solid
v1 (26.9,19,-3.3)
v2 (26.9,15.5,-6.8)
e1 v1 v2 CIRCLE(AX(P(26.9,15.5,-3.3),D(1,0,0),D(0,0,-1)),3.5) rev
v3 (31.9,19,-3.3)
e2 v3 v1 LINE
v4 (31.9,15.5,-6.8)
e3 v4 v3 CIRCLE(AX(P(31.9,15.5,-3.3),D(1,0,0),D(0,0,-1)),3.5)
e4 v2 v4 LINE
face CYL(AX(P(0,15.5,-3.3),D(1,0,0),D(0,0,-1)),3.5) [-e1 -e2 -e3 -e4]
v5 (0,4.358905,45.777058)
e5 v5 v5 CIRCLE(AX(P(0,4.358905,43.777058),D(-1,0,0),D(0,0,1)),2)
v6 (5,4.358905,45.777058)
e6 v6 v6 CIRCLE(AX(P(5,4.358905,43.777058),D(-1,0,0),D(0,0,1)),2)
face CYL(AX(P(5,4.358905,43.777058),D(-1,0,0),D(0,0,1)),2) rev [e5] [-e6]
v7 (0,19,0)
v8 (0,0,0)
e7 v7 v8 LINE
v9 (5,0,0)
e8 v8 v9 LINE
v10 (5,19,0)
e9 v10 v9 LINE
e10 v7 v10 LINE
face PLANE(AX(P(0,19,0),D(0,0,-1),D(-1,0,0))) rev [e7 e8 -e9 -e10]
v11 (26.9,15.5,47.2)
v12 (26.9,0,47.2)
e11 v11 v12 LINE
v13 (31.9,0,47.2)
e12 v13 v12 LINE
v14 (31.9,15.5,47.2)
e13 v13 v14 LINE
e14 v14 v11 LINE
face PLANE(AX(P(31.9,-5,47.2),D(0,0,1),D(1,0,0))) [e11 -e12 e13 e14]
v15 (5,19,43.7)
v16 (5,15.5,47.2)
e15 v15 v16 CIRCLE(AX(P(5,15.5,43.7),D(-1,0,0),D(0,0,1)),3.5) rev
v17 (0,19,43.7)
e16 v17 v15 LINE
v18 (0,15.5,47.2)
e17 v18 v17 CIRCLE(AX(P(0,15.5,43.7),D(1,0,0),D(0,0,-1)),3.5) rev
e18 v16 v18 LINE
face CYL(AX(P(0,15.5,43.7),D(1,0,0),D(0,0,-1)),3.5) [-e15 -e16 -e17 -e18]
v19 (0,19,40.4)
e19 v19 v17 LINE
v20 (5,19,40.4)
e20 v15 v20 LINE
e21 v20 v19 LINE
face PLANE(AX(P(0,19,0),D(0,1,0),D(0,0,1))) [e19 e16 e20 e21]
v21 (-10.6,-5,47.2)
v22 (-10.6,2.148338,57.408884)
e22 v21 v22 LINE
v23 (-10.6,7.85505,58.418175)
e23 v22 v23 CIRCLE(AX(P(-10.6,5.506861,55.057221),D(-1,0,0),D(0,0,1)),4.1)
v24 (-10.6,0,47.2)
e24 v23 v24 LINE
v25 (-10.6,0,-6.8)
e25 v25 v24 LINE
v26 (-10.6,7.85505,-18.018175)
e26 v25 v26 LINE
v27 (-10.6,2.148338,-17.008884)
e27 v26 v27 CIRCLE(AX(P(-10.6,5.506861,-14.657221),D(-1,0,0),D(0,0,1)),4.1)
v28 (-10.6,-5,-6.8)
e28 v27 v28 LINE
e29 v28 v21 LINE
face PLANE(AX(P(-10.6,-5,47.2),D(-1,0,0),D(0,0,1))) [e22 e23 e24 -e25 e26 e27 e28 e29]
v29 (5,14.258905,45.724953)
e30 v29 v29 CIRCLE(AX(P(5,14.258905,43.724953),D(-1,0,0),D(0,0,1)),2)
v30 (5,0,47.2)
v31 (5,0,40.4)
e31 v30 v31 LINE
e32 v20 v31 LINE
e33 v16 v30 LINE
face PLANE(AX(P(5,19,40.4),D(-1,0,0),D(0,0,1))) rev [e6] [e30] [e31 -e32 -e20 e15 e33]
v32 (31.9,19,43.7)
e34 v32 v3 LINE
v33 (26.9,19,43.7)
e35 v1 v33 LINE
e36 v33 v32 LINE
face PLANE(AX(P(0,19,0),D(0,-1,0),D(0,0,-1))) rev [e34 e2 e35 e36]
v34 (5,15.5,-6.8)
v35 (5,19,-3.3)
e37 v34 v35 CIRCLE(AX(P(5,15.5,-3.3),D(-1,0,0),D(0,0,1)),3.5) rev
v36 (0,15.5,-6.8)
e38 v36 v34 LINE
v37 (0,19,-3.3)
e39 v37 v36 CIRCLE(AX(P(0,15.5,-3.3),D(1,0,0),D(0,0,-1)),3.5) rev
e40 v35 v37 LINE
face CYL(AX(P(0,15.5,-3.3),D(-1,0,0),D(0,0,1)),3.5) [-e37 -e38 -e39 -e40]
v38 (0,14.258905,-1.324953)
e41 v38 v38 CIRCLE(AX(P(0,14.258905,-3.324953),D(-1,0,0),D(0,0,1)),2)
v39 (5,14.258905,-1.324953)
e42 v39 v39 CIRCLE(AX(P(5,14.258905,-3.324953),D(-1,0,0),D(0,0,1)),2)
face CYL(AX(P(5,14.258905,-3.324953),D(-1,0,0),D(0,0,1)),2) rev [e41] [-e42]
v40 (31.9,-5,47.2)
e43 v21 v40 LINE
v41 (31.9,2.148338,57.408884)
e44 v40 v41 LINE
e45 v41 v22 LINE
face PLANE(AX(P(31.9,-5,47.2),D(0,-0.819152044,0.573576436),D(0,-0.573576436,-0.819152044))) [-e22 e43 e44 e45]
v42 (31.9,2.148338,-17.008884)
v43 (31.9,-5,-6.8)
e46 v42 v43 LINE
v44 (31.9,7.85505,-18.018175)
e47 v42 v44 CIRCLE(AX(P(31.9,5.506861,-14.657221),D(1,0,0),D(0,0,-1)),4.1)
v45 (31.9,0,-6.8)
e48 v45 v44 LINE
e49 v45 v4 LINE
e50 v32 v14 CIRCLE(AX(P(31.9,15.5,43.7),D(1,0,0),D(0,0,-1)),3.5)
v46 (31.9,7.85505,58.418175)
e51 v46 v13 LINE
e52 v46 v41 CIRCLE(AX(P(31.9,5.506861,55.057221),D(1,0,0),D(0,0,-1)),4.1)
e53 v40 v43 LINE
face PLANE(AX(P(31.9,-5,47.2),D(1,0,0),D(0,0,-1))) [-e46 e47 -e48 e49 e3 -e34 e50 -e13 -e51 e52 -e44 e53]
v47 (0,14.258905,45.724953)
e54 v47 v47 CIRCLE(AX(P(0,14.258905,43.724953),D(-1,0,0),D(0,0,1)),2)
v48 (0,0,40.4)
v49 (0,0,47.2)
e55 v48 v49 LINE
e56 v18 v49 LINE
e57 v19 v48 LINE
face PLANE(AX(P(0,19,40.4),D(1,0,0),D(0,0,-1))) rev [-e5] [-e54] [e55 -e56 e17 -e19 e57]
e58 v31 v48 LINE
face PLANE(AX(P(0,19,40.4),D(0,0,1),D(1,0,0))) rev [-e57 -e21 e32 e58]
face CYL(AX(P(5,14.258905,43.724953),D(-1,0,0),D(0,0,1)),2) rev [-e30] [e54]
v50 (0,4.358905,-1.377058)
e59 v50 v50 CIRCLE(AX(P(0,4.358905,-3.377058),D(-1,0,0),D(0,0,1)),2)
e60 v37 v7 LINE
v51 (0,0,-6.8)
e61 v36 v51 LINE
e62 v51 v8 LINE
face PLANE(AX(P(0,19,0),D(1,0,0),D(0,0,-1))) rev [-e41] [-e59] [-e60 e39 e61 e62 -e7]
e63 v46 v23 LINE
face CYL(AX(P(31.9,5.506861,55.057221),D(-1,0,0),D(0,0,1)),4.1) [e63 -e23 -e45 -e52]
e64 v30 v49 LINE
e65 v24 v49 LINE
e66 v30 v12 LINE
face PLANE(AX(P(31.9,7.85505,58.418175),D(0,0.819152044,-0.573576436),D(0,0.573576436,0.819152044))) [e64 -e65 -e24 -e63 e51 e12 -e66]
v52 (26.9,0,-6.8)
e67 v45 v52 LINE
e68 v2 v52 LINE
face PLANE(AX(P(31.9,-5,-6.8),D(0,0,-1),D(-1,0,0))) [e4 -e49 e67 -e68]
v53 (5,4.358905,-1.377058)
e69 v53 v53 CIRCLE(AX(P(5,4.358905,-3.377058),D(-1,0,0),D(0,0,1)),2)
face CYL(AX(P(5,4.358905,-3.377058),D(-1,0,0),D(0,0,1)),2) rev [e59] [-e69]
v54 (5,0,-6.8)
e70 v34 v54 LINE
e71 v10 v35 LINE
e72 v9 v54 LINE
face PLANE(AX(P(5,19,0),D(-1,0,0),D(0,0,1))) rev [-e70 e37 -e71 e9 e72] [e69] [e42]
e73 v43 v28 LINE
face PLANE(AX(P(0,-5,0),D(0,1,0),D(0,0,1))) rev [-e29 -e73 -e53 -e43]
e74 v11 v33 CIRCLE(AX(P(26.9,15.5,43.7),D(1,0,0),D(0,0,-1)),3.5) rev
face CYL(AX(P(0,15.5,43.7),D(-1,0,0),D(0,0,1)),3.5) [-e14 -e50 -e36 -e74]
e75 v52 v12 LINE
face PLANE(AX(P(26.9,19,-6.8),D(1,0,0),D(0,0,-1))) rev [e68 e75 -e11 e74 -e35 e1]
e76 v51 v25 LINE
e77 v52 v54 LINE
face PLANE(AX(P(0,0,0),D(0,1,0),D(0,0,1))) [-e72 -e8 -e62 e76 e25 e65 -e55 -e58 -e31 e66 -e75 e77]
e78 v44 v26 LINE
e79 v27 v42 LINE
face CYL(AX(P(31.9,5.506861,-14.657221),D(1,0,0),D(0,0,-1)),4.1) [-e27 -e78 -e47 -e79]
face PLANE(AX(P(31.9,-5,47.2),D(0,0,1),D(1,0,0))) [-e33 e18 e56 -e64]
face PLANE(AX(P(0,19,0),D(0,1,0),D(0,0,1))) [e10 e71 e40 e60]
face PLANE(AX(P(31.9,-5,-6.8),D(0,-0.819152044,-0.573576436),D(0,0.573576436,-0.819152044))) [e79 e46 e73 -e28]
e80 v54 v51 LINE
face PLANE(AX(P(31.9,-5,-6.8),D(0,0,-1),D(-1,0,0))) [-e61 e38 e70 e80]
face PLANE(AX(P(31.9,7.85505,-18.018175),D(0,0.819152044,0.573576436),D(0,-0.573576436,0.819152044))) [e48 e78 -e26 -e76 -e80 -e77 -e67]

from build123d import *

# Parameters (mm, degrees)
SKETCH_OF_SERVO_MOTOR_W             = 42.5
SKETCH_OF_SERVO_MOTOR_H             = 54
EXTRUDE_BASE_OF_FOOT_DEPTH          = 5
POSITIONS_OF_FOOT_SIDES_W           = 5
POSITIONS_OF_FOOT_SIDES_H           = 54
POSITIONS_OF_FOOT_SIDES_H_2         = 6.8
EXTRUDE_SIDES_OF_FOOT_DEPTH         = 19
FILLET_TOP_EDGES_OF_SIDES_OF_FOOT_R = 3.5
EXTRUDE_FOOT_LIPS_DEPTH             = 42.5
FILLET_FOOT_LIPS_R                  = 4.1
HOLE_DIMENSIONS_FOR_M4_BOLT_R       = 2
EXTRUDE_CUT_HOLE_FOR_M4_BOLT_DEPTH  = 5


with BuildPart() as part:
    # Sketch of Servo Motor → Extrude Base of Foot (new body)
    with BuildSketch(Plane(origin=(0, 0, 0), x_dir=(1, 0, 0), z_dir=(0, 1, 0))):
        with Locations((10.65, -20.2)):
            Rectangle(SKETCH_OF_SERVO_MOTOR_W, SKETCH_OF_SERVO_MOTOR_H)
    extrude(amount=-EXTRUDE_BASE_OF_FOOT_DEPTH)

    # Positions of Foot Sides → Extrude Sides of Foot (add)
    with BuildSketch(Plane(origin=(0, 0, 0), x_dir=(1, 0, 0), z_dir=(0, 1, 0))):
        with Locations((29.4, -20.2)):
            Rectangle(POSITIONS_OF_FOOT_SIDES_W, POSITIONS_OF_FOOT_SIDES_H)
        with Locations((2.5, 3.4)):
            Rectangle(POSITIONS_OF_FOOT_SIDES_W, POSITIONS_OF_FOOT_SIDES_H_2)
        with Locations((2.5, -43.8)):
            Rectangle(POSITIONS_OF_FOOT_SIDES_W, POSITIONS_OF_FOOT_SIDES_H_2)
    extrude(amount=EXTRUDE_SIDES_OF_FOOT_DEPTH)

    # Fillet Top Edges of Sides of Foot
    fillet_top_edges_of_sides_of_foot_edges = [part.edges().sort_by_distance(p)[0] for p in [
        (2.5, 19, -6.8),
        (2.5, 19, 47.2),
        (29.4, 19, -6.8),
        (29.4, 19, 47.2),
    ]]
    fillet(fillet_top_edges_of_sides_of_foot_edges, radius=FILLET_TOP_EDGES_OF_SIDES_OF_FOOT_R)

    # Front and Back Foot Lips → Extrude Foot Lips (add, through all)
    with BuildSketch(Plane.ZY.offset(10.6)):
        Polygon((60.767406064, 4.5), (58.418174512, 7.855050358), (47.2, 0), (47.2, -5), align=None)
        Polygon((-6.8, 0), (-6.8, -5), (-20.367406064, 4.5), (-18.018174512, 7.855050358), align=None)
    extrude(amount=-EXTRUDE_FOOT_LIPS_DEPTH)

    # Fillet Foot Lips
    # the kernel refuses this fillet: 4.1 mm, written as the material it takes off along each edge
    with BuildSketch(Plane(origin=(-20.85, 4.5, 60.767406064), x_dir=(0, 0.8191520442889908, -0.5735764363510476), z_dir=(1, 0, 0)), Plane(origin=(-20.85, 4.5, -20.367406064), x_dir=(0, -0.5735764363510438, 0.8191520442889934), z_dir=(1, 0, 0))) as fillet_foot_lips_piece_1:
        with BuildLine():
            CenterArc((FILLET_FOOT_LIPS_R, -FILLET_FOOT_LIPS_R), FILLET_FOOT_LIPS_R, 90, 90)
            Line((0, -FILLET_FOOT_LIPS_R), (0, 0))
            Line((0, 0), (FILLET_FOOT_LIPS_R, 0))
        make_face()
    extrude(amount=63, mode=Mode.SUBTRACT)

    # Hole Dimensions for M4 Bolt → Extrude Cut Hole for M4 Bolt (cut)
    with BuildSketch(Plane.ZY):
        with Locations((-3.324953132, 14.258904835)):
            Circle(HOLE_DIMENSIONS_FOR_M4_BOLT_R)
        with Locations((-3.377058396, 4.358904835)):
            Circle(HOLE_DIMENSIONS_FOR_M4_BOLT_R)
        with Locations((43.724953132, 14.258904835)):
            Circle(HOLE_DIMENSIONS_FOR_M4_BOLT_R)
        with Locations((43.777058396, 4.358904835)):
            Circle(HOLE_DIMENSIONS_FOR_M4_BOLT_R)
    extrude(amount=-EXTRUDE_CUT_HOLE_FOR_M4_BOLT_DEPTH, mode=Mode.SUBTRACT)


solid = part.part
